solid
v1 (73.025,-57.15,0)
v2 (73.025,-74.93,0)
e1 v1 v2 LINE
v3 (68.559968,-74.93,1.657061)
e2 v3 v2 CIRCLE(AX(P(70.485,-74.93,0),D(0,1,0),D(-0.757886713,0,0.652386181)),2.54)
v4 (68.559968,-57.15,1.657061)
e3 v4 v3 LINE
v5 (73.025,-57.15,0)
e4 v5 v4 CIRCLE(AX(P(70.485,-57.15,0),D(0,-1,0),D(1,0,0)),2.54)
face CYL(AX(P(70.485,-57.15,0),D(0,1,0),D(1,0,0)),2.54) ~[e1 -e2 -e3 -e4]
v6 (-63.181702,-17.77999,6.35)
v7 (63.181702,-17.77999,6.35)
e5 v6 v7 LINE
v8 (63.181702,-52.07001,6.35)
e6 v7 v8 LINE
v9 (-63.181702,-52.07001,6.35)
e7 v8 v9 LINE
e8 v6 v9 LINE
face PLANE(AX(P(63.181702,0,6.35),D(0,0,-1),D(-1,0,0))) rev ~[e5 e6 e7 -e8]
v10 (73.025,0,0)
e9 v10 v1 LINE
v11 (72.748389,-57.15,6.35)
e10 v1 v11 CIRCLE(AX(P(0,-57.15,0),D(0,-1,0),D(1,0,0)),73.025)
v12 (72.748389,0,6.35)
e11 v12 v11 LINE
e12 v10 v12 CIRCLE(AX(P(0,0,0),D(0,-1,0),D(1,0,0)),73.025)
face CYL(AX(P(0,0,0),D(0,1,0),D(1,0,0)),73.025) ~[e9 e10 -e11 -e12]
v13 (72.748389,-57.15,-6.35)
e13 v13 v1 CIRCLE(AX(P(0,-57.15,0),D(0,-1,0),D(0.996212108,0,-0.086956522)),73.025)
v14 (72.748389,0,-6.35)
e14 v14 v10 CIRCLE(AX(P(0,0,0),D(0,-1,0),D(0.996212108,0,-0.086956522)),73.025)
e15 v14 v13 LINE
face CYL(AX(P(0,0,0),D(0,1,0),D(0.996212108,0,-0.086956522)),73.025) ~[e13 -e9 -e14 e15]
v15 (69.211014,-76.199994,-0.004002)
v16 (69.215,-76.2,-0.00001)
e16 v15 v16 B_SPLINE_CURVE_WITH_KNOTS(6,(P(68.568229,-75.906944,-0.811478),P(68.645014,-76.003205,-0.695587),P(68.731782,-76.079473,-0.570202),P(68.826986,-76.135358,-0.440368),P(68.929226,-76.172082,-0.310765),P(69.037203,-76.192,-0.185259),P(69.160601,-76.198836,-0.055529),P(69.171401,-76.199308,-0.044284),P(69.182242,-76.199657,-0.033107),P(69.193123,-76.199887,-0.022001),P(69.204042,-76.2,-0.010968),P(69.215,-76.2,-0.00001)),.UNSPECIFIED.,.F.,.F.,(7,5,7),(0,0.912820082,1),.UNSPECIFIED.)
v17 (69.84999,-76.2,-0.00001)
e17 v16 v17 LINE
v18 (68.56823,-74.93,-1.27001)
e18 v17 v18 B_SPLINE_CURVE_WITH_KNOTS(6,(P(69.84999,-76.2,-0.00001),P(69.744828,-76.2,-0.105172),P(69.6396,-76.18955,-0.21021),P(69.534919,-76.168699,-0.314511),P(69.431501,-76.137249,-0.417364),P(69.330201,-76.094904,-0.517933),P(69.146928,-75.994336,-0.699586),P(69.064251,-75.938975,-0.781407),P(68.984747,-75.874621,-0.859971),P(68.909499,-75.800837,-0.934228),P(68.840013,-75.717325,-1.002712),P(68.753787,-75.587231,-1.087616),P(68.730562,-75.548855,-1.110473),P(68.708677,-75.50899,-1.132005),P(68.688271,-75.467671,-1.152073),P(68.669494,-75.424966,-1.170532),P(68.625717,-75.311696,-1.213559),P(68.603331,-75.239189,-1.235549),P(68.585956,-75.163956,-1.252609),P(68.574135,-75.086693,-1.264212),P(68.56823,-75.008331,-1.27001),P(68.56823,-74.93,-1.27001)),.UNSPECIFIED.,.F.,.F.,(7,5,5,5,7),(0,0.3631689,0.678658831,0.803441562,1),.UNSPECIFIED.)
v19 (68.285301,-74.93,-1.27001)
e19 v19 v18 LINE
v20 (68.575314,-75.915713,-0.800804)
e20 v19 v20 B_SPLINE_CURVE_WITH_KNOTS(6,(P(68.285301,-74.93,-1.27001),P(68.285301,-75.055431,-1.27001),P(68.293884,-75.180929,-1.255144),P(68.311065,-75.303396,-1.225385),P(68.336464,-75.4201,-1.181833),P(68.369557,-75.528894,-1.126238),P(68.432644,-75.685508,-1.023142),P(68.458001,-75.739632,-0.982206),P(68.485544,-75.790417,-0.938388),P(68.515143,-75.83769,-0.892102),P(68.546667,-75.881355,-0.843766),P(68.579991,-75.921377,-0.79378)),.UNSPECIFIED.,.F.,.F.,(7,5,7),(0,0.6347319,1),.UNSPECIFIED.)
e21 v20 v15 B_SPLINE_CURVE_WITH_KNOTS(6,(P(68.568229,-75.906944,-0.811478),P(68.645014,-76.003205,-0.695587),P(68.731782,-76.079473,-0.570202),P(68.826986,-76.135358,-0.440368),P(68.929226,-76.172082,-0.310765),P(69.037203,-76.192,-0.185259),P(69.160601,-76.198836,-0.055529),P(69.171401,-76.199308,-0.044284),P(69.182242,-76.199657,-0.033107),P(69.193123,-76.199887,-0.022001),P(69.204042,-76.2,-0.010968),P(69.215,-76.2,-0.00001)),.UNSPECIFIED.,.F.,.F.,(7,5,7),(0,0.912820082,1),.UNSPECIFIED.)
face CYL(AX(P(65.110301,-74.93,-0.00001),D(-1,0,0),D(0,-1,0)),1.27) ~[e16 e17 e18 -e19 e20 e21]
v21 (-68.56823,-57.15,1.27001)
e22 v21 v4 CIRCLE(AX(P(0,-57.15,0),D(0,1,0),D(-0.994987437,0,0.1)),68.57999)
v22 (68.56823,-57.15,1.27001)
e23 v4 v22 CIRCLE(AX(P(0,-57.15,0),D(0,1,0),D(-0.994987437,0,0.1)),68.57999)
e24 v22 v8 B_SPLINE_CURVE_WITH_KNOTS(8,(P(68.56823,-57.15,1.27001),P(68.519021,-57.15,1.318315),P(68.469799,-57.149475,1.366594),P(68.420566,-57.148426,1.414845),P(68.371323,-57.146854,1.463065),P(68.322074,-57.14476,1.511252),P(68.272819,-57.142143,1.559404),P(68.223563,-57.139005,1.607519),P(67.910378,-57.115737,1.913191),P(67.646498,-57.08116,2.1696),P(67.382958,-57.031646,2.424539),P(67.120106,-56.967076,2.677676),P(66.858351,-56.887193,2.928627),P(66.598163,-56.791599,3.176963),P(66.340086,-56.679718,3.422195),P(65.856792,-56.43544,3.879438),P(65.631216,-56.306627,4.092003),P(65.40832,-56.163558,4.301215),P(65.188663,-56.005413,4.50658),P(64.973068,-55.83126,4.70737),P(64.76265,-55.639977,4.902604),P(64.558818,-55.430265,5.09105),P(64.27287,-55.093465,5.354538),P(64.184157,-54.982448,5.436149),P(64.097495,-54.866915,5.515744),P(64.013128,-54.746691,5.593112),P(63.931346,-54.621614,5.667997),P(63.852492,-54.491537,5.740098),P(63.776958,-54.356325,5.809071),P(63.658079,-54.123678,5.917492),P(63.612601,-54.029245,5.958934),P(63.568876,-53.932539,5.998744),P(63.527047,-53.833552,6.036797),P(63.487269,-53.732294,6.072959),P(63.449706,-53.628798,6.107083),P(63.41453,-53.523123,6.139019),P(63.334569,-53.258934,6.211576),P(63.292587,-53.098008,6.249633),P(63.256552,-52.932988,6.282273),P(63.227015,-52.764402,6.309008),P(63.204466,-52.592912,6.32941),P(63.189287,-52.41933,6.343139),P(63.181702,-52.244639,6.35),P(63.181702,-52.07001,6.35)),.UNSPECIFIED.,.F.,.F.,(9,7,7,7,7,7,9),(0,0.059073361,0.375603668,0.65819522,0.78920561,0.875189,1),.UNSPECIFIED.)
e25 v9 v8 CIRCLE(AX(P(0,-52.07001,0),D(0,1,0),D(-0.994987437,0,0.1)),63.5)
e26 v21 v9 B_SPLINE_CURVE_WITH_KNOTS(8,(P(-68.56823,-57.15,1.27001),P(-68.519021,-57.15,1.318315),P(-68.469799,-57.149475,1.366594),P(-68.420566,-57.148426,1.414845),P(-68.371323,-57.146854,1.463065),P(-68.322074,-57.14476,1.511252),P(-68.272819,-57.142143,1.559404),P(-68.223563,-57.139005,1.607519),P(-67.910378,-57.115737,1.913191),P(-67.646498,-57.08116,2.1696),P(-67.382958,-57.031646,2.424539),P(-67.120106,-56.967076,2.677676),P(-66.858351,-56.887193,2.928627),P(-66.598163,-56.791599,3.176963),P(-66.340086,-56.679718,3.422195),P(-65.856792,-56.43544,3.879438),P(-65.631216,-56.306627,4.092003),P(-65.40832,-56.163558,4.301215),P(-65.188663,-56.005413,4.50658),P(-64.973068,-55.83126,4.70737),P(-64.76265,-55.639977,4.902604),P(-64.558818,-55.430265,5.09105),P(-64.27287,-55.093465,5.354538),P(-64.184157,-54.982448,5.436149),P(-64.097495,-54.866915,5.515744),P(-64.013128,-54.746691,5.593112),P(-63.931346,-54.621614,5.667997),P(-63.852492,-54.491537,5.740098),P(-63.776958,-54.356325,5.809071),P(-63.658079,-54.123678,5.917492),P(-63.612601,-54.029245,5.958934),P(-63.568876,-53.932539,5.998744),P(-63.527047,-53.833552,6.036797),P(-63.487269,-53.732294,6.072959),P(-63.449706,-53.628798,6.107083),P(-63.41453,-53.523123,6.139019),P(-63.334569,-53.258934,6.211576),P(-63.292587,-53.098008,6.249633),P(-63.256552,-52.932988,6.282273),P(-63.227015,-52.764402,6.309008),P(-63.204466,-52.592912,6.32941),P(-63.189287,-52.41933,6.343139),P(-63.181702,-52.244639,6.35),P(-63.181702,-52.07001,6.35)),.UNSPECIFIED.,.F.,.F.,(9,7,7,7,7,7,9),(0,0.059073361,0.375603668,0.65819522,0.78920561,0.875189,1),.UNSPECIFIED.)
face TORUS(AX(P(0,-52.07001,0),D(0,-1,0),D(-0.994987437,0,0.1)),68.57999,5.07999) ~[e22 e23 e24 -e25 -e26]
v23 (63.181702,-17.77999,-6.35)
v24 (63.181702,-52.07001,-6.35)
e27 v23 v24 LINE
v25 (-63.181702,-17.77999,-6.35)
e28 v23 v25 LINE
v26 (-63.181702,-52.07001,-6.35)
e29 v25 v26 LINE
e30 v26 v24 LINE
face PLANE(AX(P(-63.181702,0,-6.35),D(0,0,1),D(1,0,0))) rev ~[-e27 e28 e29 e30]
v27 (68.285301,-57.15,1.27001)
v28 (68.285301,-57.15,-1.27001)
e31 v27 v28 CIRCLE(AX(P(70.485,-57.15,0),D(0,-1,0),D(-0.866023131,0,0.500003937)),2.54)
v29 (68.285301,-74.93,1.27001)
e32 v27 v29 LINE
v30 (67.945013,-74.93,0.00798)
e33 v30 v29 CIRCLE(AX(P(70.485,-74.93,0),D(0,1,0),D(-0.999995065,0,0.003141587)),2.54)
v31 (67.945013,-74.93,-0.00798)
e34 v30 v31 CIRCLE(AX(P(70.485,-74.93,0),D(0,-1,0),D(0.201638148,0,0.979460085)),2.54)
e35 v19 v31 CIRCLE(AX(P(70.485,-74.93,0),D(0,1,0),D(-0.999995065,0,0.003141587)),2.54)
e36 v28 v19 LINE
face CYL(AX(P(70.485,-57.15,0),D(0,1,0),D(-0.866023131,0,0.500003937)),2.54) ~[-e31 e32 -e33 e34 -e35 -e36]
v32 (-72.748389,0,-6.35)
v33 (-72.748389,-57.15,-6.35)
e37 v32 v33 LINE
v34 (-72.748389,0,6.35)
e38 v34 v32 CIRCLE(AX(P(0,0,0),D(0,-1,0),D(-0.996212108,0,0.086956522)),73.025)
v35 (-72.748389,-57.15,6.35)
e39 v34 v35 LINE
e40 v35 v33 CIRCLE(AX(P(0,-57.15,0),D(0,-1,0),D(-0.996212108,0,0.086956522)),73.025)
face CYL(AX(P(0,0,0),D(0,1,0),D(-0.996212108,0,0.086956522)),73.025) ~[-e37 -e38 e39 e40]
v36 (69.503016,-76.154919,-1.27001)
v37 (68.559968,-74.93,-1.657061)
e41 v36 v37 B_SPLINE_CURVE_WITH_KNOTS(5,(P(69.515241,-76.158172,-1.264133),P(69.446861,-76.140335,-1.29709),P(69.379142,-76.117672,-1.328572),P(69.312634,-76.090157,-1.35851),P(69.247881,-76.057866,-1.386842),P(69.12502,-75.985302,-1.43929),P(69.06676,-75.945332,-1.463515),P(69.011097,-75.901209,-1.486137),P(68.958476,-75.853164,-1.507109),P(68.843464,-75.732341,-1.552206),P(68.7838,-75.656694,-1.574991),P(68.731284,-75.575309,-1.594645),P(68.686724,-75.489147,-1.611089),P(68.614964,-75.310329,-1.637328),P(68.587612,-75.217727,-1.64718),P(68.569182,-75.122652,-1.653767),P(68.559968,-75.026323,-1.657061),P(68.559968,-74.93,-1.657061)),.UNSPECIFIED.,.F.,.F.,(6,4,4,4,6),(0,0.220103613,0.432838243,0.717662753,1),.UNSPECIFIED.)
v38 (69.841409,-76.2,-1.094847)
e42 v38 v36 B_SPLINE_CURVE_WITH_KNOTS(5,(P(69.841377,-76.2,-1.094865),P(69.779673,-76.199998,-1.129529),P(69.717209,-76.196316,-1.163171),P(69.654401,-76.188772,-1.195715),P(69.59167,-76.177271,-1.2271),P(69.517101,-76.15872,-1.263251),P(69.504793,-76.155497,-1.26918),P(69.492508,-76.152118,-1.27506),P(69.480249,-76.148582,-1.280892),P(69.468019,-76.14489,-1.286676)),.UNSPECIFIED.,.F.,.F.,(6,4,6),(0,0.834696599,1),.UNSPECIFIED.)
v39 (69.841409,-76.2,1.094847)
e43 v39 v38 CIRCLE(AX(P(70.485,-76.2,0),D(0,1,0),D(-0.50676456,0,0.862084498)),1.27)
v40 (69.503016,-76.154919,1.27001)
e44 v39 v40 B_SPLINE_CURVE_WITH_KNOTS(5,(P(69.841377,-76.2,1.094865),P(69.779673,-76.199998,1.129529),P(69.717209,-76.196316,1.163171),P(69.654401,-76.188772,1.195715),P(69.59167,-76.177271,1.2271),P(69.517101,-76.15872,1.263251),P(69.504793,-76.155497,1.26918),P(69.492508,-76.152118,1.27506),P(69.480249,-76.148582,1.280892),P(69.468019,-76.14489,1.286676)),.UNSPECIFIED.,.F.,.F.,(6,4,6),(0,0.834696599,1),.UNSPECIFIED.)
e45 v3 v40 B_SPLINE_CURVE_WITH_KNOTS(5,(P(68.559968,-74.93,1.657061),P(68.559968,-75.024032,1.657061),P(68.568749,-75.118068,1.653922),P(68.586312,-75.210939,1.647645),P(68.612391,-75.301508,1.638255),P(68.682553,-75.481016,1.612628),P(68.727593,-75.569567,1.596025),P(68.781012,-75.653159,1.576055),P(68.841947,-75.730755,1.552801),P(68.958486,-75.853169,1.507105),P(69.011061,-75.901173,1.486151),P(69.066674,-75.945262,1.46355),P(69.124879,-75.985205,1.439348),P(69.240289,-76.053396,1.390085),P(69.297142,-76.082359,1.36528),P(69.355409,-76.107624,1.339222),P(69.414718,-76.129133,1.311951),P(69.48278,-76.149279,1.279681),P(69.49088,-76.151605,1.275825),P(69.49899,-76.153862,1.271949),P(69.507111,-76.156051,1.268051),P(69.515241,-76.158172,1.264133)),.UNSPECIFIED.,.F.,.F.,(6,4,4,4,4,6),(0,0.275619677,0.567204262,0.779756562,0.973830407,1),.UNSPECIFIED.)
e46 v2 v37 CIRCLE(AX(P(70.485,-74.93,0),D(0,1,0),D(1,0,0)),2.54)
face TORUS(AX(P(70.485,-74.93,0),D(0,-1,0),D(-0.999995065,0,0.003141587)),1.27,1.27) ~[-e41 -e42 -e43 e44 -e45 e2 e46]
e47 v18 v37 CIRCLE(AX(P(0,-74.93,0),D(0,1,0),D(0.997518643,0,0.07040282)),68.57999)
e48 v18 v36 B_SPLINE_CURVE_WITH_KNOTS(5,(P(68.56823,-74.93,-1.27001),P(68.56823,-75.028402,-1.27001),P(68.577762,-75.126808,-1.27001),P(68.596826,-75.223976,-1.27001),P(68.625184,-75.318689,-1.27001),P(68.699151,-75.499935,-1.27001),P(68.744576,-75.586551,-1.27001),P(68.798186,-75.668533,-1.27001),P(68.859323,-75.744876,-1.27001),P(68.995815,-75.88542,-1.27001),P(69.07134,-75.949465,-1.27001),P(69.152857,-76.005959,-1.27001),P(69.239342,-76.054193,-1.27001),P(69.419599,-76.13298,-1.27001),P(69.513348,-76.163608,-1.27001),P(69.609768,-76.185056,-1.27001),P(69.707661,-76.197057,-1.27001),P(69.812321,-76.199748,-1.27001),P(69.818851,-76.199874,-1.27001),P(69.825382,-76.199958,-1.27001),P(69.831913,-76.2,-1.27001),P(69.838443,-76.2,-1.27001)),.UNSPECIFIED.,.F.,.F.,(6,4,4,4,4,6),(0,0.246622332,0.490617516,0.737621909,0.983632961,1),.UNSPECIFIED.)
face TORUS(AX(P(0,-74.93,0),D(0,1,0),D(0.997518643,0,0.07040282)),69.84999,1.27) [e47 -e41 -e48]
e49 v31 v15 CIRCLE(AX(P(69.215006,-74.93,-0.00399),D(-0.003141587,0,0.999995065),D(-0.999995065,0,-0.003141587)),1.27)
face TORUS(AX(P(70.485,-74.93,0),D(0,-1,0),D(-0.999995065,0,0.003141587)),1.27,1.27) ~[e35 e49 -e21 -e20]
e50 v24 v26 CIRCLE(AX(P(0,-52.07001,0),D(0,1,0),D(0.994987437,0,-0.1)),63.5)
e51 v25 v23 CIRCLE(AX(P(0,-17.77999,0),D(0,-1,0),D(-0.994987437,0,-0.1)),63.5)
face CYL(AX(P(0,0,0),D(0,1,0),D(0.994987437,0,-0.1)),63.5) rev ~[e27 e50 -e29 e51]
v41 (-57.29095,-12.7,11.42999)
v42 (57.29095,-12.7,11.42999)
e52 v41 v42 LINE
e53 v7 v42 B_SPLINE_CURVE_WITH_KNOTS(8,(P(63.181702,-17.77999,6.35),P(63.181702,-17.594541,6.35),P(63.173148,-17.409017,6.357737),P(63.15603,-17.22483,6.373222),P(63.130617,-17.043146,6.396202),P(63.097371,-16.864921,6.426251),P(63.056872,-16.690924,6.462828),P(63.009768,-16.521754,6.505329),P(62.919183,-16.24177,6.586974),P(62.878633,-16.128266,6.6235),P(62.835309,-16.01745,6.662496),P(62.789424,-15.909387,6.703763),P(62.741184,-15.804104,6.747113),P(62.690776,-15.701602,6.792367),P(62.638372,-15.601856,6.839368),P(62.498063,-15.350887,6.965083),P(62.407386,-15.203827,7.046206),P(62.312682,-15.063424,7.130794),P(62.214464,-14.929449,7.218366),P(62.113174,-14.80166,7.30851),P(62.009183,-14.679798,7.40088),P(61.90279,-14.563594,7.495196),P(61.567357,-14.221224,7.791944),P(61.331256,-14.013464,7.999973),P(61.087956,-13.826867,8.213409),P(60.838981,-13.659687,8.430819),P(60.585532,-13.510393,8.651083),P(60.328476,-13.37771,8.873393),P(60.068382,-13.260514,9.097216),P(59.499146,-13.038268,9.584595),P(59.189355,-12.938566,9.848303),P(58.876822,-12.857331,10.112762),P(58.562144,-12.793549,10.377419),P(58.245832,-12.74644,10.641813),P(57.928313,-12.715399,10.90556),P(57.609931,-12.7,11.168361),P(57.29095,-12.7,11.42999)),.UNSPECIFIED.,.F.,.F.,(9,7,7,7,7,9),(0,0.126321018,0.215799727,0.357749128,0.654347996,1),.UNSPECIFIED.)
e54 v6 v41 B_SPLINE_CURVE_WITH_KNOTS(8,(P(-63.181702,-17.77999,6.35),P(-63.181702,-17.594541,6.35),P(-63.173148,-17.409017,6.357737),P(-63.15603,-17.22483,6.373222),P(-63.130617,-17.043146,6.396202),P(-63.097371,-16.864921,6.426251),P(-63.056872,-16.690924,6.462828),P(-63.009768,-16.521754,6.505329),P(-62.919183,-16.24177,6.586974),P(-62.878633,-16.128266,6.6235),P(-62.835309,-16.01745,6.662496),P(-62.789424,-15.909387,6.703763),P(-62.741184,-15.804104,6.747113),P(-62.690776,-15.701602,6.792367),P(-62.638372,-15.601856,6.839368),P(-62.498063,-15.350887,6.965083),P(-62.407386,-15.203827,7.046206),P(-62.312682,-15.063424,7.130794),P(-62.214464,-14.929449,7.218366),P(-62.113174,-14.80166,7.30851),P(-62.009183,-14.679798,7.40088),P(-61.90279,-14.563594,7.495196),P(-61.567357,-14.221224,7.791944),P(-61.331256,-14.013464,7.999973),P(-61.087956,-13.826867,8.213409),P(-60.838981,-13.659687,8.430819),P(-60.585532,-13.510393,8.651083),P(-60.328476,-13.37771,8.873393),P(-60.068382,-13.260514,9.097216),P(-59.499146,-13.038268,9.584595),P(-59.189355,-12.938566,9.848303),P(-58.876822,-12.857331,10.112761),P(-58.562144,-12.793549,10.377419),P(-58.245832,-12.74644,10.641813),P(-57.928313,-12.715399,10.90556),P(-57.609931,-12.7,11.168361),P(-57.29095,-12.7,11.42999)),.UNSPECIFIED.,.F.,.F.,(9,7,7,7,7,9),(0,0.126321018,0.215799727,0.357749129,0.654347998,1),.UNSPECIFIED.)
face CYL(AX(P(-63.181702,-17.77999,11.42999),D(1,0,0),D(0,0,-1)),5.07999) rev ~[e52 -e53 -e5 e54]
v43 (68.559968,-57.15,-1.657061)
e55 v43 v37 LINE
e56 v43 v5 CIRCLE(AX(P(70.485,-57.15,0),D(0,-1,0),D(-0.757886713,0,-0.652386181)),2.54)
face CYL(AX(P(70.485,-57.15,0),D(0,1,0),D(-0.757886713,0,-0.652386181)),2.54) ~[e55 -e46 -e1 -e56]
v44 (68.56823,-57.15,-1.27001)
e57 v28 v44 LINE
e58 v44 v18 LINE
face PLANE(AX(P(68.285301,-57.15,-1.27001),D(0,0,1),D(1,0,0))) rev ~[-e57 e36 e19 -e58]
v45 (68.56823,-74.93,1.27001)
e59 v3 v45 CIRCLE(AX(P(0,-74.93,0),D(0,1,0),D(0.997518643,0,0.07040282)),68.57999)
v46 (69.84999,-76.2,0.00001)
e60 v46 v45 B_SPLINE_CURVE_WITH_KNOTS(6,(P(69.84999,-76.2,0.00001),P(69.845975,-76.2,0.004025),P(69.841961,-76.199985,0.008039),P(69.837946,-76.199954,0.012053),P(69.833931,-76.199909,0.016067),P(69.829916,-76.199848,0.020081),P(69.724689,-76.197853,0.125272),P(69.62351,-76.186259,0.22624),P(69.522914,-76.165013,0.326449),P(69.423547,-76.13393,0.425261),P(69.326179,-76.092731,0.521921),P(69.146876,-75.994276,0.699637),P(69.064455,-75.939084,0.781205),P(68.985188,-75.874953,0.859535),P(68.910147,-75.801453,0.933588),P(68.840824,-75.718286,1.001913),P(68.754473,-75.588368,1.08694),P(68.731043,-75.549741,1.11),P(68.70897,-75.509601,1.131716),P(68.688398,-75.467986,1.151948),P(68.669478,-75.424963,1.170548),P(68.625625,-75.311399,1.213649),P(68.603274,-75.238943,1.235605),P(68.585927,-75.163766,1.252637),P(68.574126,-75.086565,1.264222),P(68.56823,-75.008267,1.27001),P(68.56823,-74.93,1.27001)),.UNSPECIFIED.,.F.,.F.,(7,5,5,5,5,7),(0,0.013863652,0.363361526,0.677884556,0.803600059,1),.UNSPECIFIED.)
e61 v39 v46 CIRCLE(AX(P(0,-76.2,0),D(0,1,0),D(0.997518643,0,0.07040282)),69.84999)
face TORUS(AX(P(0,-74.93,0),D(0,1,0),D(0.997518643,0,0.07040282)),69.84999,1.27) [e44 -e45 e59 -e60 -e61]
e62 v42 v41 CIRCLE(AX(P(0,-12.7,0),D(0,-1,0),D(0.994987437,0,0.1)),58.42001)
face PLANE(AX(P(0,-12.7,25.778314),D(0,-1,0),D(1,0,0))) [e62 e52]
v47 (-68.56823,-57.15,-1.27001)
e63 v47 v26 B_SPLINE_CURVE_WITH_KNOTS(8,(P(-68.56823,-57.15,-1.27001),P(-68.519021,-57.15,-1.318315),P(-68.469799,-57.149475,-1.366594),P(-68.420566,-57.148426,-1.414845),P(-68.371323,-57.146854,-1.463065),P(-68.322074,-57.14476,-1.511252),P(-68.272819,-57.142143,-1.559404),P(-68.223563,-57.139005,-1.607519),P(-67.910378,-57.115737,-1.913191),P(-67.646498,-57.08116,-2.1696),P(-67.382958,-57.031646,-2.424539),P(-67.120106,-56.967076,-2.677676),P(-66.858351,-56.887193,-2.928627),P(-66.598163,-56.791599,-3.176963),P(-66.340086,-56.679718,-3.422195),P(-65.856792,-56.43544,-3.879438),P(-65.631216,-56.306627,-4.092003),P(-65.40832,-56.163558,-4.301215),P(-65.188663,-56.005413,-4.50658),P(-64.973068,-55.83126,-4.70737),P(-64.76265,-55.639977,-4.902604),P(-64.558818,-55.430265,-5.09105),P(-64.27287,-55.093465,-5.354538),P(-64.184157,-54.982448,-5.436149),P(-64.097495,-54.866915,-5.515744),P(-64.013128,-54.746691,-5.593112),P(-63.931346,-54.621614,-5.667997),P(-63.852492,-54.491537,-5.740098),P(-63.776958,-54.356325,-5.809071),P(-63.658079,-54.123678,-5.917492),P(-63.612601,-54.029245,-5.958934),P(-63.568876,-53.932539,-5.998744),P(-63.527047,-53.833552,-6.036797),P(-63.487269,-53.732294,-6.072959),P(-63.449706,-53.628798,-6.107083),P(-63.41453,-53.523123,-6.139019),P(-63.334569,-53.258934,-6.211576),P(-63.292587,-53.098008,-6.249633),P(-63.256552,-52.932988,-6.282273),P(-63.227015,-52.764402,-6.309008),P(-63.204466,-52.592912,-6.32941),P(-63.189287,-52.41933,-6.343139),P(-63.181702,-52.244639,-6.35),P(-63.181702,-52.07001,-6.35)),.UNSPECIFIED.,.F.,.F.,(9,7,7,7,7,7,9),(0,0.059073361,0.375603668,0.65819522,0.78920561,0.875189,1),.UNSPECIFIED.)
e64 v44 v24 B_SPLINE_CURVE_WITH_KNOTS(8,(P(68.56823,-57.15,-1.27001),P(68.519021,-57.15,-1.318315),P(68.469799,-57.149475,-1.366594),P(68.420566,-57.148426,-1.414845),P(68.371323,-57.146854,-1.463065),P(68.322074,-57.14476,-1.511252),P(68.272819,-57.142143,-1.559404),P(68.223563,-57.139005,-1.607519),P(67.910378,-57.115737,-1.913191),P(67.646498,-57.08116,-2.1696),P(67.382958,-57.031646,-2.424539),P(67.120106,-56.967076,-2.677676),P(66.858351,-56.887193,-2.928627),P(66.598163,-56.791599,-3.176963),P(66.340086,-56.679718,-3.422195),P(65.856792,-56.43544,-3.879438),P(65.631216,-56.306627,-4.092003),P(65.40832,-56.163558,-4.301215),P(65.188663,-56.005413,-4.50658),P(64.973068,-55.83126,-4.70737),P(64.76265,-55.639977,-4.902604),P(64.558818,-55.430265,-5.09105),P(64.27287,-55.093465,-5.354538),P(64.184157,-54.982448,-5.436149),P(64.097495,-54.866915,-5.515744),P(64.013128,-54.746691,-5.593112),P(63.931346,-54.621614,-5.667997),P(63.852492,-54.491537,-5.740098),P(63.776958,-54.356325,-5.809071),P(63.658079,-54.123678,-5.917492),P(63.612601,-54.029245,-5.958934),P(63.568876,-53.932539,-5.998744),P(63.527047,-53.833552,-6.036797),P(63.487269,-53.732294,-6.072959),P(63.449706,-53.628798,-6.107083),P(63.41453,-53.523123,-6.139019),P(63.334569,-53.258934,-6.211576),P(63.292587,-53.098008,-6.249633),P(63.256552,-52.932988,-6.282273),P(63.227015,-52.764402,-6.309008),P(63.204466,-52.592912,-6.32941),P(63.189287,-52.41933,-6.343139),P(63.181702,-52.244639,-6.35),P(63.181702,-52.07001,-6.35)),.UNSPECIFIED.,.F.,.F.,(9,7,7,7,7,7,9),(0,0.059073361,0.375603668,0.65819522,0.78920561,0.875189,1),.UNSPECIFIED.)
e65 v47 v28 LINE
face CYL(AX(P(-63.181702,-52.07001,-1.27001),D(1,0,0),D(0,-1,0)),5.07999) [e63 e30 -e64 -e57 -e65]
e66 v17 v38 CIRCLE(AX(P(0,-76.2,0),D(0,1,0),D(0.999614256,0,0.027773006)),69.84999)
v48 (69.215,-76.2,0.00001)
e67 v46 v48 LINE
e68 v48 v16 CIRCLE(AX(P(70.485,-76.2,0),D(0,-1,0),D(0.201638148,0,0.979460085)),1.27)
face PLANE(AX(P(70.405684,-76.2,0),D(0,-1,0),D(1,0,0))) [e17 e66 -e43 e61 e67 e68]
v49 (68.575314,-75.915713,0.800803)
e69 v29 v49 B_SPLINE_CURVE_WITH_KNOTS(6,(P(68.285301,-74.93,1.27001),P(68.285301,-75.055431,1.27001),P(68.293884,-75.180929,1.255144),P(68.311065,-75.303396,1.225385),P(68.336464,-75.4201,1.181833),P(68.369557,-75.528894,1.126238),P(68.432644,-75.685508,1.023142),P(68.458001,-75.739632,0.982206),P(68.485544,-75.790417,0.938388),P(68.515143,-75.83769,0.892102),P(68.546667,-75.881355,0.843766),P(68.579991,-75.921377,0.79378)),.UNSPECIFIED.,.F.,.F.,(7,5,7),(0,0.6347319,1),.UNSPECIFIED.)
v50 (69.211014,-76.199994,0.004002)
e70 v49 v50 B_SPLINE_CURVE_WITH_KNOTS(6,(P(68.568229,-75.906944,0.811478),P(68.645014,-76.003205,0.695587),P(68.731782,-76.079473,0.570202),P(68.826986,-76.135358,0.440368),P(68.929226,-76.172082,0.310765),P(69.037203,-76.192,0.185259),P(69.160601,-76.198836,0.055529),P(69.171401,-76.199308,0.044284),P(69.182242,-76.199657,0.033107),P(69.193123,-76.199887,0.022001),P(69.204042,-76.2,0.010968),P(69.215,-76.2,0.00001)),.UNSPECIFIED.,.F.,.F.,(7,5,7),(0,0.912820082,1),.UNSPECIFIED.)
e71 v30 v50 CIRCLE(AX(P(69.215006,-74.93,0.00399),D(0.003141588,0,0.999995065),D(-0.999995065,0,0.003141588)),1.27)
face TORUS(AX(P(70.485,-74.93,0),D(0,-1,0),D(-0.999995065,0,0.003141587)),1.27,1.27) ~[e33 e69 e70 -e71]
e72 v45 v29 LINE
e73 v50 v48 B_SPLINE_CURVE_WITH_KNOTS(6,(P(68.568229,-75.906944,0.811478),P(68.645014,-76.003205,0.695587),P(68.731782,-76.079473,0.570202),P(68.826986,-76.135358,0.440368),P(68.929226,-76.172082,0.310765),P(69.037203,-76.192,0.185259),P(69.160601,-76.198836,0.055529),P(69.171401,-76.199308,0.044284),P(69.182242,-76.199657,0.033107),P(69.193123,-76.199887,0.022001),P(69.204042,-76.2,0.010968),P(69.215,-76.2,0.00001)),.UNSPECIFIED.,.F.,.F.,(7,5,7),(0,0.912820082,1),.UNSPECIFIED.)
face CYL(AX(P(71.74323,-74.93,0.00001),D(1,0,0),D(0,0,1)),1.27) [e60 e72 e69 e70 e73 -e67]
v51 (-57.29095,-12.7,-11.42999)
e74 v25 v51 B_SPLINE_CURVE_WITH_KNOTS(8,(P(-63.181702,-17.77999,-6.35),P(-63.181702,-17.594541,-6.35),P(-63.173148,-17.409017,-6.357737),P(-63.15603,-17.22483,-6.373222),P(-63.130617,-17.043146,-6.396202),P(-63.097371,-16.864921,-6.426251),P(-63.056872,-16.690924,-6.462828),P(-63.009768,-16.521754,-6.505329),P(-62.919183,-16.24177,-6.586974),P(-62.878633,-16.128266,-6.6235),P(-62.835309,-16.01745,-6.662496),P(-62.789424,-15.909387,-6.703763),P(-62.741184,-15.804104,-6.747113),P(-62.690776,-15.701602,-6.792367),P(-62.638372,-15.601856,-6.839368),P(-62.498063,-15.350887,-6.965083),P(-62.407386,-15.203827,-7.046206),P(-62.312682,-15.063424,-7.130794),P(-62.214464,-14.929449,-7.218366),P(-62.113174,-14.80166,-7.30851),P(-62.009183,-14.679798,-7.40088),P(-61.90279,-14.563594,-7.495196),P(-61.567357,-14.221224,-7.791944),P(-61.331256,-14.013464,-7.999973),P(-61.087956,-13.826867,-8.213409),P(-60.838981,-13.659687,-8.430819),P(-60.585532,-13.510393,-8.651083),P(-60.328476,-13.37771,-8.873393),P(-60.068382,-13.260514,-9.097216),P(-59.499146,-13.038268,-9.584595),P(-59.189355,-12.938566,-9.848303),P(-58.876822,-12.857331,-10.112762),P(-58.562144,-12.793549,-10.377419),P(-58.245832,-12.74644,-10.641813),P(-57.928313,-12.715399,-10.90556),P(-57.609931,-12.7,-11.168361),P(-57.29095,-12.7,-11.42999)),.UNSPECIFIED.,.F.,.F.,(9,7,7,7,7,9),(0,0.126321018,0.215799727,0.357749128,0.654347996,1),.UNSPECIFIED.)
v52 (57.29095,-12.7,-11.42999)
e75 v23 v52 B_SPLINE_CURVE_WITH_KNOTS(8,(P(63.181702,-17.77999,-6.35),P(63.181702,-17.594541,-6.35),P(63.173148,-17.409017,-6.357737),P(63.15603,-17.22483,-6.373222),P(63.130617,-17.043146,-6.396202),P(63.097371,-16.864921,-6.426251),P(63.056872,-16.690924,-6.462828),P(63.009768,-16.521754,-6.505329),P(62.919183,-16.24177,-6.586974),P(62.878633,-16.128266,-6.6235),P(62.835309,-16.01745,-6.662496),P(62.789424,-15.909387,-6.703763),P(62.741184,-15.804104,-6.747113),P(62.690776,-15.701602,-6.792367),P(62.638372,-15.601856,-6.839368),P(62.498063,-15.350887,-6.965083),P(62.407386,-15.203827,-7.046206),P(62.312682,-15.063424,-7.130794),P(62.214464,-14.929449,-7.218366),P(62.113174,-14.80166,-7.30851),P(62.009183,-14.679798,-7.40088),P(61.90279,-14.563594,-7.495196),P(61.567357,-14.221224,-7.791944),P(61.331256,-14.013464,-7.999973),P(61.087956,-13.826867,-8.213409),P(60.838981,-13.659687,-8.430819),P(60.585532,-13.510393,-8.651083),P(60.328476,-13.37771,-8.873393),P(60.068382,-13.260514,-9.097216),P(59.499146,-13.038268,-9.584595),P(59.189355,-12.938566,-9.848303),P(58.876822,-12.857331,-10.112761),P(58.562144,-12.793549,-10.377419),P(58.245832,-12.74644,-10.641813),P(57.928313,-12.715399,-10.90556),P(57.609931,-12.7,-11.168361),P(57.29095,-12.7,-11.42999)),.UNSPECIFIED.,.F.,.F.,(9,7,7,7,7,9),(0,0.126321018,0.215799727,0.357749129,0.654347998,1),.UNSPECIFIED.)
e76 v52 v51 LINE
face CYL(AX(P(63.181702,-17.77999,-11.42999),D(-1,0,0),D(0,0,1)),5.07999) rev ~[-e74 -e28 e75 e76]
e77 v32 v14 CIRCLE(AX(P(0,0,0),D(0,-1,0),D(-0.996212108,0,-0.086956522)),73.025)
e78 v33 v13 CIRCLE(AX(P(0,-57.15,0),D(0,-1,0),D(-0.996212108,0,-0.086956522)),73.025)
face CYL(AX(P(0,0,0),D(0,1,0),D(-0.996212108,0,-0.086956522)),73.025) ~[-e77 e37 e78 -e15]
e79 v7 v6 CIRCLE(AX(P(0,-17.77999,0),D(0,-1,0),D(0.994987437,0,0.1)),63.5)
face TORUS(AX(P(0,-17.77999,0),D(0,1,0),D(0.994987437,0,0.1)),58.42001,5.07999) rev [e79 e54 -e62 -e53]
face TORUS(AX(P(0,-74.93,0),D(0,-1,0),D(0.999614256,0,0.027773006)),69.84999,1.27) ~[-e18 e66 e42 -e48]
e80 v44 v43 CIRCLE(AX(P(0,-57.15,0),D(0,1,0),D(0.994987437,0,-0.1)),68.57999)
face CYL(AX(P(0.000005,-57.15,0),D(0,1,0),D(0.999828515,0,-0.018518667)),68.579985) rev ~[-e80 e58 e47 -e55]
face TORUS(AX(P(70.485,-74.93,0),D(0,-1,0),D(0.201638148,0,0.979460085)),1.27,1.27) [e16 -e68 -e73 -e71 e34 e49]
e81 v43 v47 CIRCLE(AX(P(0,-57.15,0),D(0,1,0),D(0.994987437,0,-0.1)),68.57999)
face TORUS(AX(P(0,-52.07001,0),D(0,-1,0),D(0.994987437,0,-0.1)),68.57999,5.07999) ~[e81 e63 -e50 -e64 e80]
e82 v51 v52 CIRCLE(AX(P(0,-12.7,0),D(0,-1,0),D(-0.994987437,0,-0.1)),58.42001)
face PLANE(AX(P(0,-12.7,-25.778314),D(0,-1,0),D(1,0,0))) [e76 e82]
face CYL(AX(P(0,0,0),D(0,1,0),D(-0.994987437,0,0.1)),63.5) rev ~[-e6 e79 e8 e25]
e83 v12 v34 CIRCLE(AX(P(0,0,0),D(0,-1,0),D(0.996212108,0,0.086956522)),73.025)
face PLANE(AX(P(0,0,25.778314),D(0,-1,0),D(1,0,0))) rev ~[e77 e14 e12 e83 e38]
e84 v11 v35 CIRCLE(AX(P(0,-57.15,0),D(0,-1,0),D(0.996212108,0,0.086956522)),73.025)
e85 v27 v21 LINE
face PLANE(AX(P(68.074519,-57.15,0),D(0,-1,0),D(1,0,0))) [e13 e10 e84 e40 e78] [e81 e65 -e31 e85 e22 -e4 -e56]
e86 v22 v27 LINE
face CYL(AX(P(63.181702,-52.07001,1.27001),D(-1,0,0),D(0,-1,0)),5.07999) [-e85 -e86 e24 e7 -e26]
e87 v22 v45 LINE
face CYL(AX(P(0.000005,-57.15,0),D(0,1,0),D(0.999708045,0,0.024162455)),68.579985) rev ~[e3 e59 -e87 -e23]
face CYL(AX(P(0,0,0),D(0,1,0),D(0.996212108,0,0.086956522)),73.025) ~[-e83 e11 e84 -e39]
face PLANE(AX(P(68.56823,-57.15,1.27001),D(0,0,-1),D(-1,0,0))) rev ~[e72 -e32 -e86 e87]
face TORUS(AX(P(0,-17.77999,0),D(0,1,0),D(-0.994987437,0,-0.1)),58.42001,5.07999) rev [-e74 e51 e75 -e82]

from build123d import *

# Parameters (mm, degrees)
F1_DEPTH     = 57.15
F2_DEPTH     = 12.7
F3_R         = 5.07999
F5_DEPTH     = 19.05
F6_T3_ANGLE  = 359.64
F6_T6_ANGLE  = 5.6286048719
F6_T10_ANGLE = 5.6286048719
F6_T14_DEPTH = 6.6329282975
F6_S15_R     = 68.5799900031
F6_T16_DEPTH = 5
F6_T19_ANGLE = 203.2655397093
F6_T22_DEPTH = 6.6329282975
F6_S23_R     = 68.5799900031
F6_T24_DEPTH = 5
F6_T27_ANGLE = 5.6286048719
F6_T31_ANGLE = 5.6286048719
F6_T36_ANGLE = 5.6286048719
F6_T41_DEPTH = 6.6329282975
F6_S42_R     = 68.5799900031
F6_T43_DEPTH = 5
F6_T48_DEPTH = 6.6329282975
F6_S49_R     = 68.5799900031
F6_T50_DEPTH = 5
F6_T53_ANGLE = 5.6286048719


# Not quite as in the source:
# - a fillet or chamfer that OpenCascade refuses, or shapes differently, is made with other operations: its cross-section is extruded or revolved along the edge and cut away or added
# - a fillet or chamfer is up to 0.001 mm smaller than in the source, because OpenCascade refuses the exact size


with BuildPart() as f1:
    # F0 (on Front) → F1 (new body)
    with BuildSketch(Plane.XZ):
        with BuildLine():
            ThreePointArc((72.7483891574, -6.35), (72.9558145154, -3.1780109172), (73.025, 0))
            ThreePointArc((73.025, 0), (72.9558145154, 3.1780109172), (72.7483891574, 6.35))
            Line((72.7483891574, 6.35), (63.1817022563, 6.35))
            ThreePointArc((63.1817022563, 6.35), (63.4203756425, 3.1789862163), (63.5, 0))
            ThreePointArc((63.5, 0), (63.4203756425, -3.1789862163), (63.1817022563, -6.35))
            Line((63.1817022563, -6.35), (72.7483891574, -6.35))
        make_face()
        with BuildLine():
            Line((63.1817022563, 6.35), (72.7483891574, 6.35))
            ThreePointArc((72.7483891574, 6.35), (0, 73.025), (-72.7483891574, 6.35))
            Line((-72.7483891574, 6.35), (-63.1817022563, 6.35))
            ThreePointArc((-63.1817022563, 6.35), (0, 63.5), (63.1817022563, 6.35))
        make_face()
        with BuildLine():
            ThreePointArc((-72.7483891574, -6.35), (0, -73.025), (72.7483891574, -6.35))
            Line((72.7483891574, -6.35), (63.1817022563, -6.35))
            ThreePointArc((63.1817022563, -6.35), (0, -63.5), (-63.1817022563, -6.35))
            Line((-63.1817022563, -6.35), (-72.7483891574, -6.35))
        make_face()
        with BuildLine():
            Line((-63.1817022563, 6.35), (-72.7483891574, 6.35))
            ThreePointArc((-72.7483891574, 6.35), (-73.025, 0), (-72.7483891574, -6.35))
            Line((-72.7483891574, -6.35), (-63.1817022563, -6.35))
            ThreePointArc((-63.1817022563, -6.35), (-63.5, 0), (-63.1817022563, 6.35))
        make_face()
        with BuildLine():
            ThreePointArc((63.5, 0), (63.4203756425, 3.1789862163), (63.1817022563, 6.35))
            Line((63.1817022563, 6.35), (-63.1817022563, 6.35))
            ThreePointArc((-63.1817022563, 6.35), (-63.5, 0), (-63.1817022563, -6.35))
            Line((-63.1817022563, -6.35), (63.1817022563, -6.35))
            ThreePointArc((63.1817022563, -6.35), (63.4203756425, -3.1789862163), (63.5, 0))
        make_face()
    extrude(amount=F1_DEPTH)

    # F0 (on Front) → F2 (join)
    with BuildSketch(Plane.XZ):
        with BuildLine():
            Line((-63.1817022563, 6.35), (63.1817022563, 6.35))
            ThreePointArc((63.1817022563, 6.35), (0, 63.5), (-63.1817022563, 6.35))
        make_face()
        with BuildLine():
            ThreePointArc((-63.1817022563, -6.35), (0, -63.5), (63.1817022563, -6.35))
            Line((63.1817022563, -6.35), (-63.1817022563, -6.35))
        make_face()
    extrude(amount=F2_DEPTH)

    # F3 (radius 5.08 in the source; OpenCascade refuses exactly that, so slightly less here)
    f3_edges = [f1.edges().sort_by_distance(p)[0] for p in [
        (0, -12.7, -6.35),
        (0, -12.7, -63.5),
        (0, -12.7, 63.5),
        (0, -12.7, 6.35),
        (0, -57.15, -63.5),
        (0, -57.15, 63.5),
        (0, -57.15, 6.35),
        (0, -57.15, -6.35),
    ]]
    fillet(f3_edges, radius=F3_R)

    # F4 (on face) → F5 (join)
    with BuildSketch(Plane.XZ.offset(57.15)):
        with BuildLine():
            ThreePointArc((68.5599677477, -1.6570609004), (71.3687471582, -2.3813002667), (73.025, 0))
            ThreePointArc((73.025, 0), (71.3687471582, 2.3813002667), (68.5599677477, 1.6570609004))
            ThreePointArc((68.5599677477, 1.6570609004), (68.5643717635, 1.46354128), (68.5682295455, 1.27001))
            Line((68.5682295455, 1.27001), (68.2853012479, 1.27001))
            ThreePointArc((68.2853012479, 1.27001), (67.945, 0), (68.2853012479, -1.27001))
            Line((68.2853012479, -1.27001), (68.5682295455, -1.27001))
            ThreePointArc((68.5682295455, -1.27001), (68.5643717635, -1.46354128), (68.5599677477, -1.6570609004))
        make_face()
    extrude(amount=F5_DEPTH)

    # F6: fillet of radius 1.27 on 6 edges, made by hand


with BuildPart() as f6_tool1:
    # F6_s2 → F6_t3 (revolve)
    with BuildSketch(Plane(origin=(0.0006956568, 0, 0.2214337012), x_dir=(0, 1, 0), z_dir=(-0.0031415875, 0, -0.9999950652))):
        with BuildLine():
            ThreePointArc((-74.93, 67.9446521708), (-75.8280256121, 68.3166265586), (-76.2, 69.2146521708))
            Line((-76.2, 69.2146521708), (-76.2, 67.9446521708))
            Line((-76.2, 67.9446521708), (-74.93, 67.9446521708))
        make_face()
    revolve(axis=Axis((70.485, -76.2, 0), (0, 1, 0)), revolution_arc=F6_T3_ANGLE)


with BuildPart() as f6_tool4:
    # F6_s5 → F6_t6 (revolve)
    with BuildSketch(Plane(origin=(0, 0, 2e-10), x_dir=(0, 1, 0), z_dir=(-0.0704028203, 0, 0.9975186429))):
        with BuildLine():
            ThreePointArc((-74.93, -68.57999), (-75.8280256121, -68.9519643879), (-76.2, -69.84999))
            Line((-76.2, -69.84999), (-76.2, -68.57999))
            Line((-76.2, -68.57999), (-74.93, -68.57999))
        make_face()
    revolve(axis=Axis((-3.1e-09, -76.2, -1e-10), (0, 1, 0)), revolution_arc=F6_T6_ANGLE)

    split(bisect_by=Plane.XY.offset(1.27001), keep=Keep.TOP)


with BuildPart() as f6_tool8:
    # F6_s9 → F6_t10 (revolve)
    with BuildSketch(Plane(origin=(0, 0, 2e-10), x_dir=(0, 1, 0), z_dir=(-0.0704028203, 0, 0.9975186429))):
        with BuildLine():
            ThreePointArc((-74.93, -68.57999), (-75.8280256121, -68.9519643879), (-76.2, -69.84999))
            Line((-76.2, -69.84999), (-76.2, -68.57999))
            Line((-76.2, -68.57999), (-74.93, -68.57999))
        make_face()
    revolve(axis=Axis((-3.1e-09, -76.2, -1e-10), (0, 1, 0)), revolution_arc=F6_T10_ANGLE)

    split(bisect_by=Plane.XY.offset(-1.27001), keep=Keep.BOTTOM)


with BuildPart() as f6_tool12:
    # F6_s13 → F6_t14 (new body)
    with BuildSketch(Plane.YZ.offset(71.7432295455)):
        with BuildLine():
            ThreePointArc((-74.93, 1.27001), (-75.8280256121, 0.8980356121), (-76.2, 1e-05))
            Line((-76.2, 1e-05), (-76.2, 1.27001))
            Line((-76.2, 1.27001), (-74.93, 1.27001))
        make_face()
    extrude(amount=-F6_T14_DEPTH)

    # F6_s15 → F6_t16 (intersect, symmetric)
    with BuildSketch(Plane.XZ.offset(75.6)):
        with Locations((-3.1e-09, -1e-10)):
            Circle(F6_S15_R)
    extrude(amount=F6_T16_DEPTH, both=True, mode=Mode.INTERSECT)


with BuildPart() as f6_tool17:
    # F6_s18 → F6_t19 (revolve)
    with BuildSketch(Plane(origin=(67.6192248978, 0, -13.9205420564), x_dir=(0, 1, 0), z_dir=(0.9794600845, 0, -0.2016381483))):
        with BuildLine():
            ThreePointArc((-74.93, 16.7524648841), (-75.8280256121, 16.3804904962), (-76.2, 15.4824648841))
            Line((-76.2, 15.4824648841), (-76.2, 16.7524648841))
            Line((-76.2, 16.7524648841), (-74.93, 16.7524648841))
        make_face()
    revolve(axis=Axis((70.485, -76.2, 0), (0, -1, 0)), revolution_arc=F6_T19_ANGLE)


with BuildPart() as f6_tool20:
    # F6_s21 → F6_t22 (new body)
    with BuildSketch(Plane.YZ.offset(65.1103012479)):
        with BuildLine():
            ThreePointArc((-76.2, -1e-05), (-75.8280256121, -0.8980356121), (-74.93, -1.27001))
            Line((-74.93, -1.27001), (-76.2, -1.27001))
            Line((-76.2, -1.27001), (-76.2, -1e-05))
        make_face()
    extrude(amount=F6_T22_DEPTH)

    # F6_s23 → F6_t24 (intersect, symmetric)
    with BuildSketch(Plane.XZ.offset(75.6)):
        with Locations((-3.1e-09, 1e-10)):
            Circle(F6_S23_R)
    extrude(amount=F6_T24_DEPTH, both=True, mode=Mode.INTERSECT)


with BuildPart() as f6_tool25:
    # F6_s26 → F6_t27 (revolve)
    with BuildSketch(Plane(origin=(0, 0, 2e-10), x_dir=(0, 1, 0), z_dir=(-0.027773006, 0, 0.9996142557))):
        with BuildLine():
            ThreePointArc((-76.2, -69.84999), (-75.8280256121, -68.9519643879), (-74.93, -68.57999))
            Line((-74.93, -68.57999), (-76.2, -68.57999))
            Line((-76.2, -68.57999), (-76.2, -69.84999))
        make_face()
    revolve(axis=Axis((-3.1e-09, -76.2, 1e-10), (0, 1, 0)), revolution_arc=F6_T27_ANGLE)

    split(bisect_by=Plane.XY.offset(1.27001), keep=Keep.TOP)


with BuildPart() as f6_tool29:
    # F6_s30 → F6_t31 (revolve)
    with BuildSketch(Plane(origin=(0, 0, 2e-10), x_dir=(0, 1, 0), z_dir=(-0.027773006, 0, 0.9996142557))):
        with BuildLine():
            ThreePointArc((-76.2, -69.84999), (-75.8280256121, -68.9519643879), (-74.93, -68.57999))
            Line((-74.93, -68.57999), (-76.2, -68.57999))
            Line((-76.2, -68.57999), (-76.2, -69.84999))
        make_face()
    revolve(axis=Axis((-3.1e-09, -76.2, 1e-10), (0, 1, 0)), revolution_arc=F6_T31_ANGLE)

    split(bisect_by=Plane.XY.offset(-1.27001), keep=Keep.BOTTOM)


with BuildPart() as f6_tool34:
    # F6_s35 → F6_t36 (revolve)
    with BuildSketch(Plane(origin=(0, 0, 2e-10), x_dir=(0, 1, 0), z_dir=(-0.0704028203, 0, 0.9975186429))):
        with BuildLine():
            ThreePointArc((-74.93, -68.57999), (-75.8280256121, -68.9519643879), (-76.2, -69.84999))
            Line((-76.2, -69.84999), (-76.2, -68.57999))
            Line((-76.2, -68.57999), (-74.93, -68.57999))
        make_face()
    revolve(axis=Axis((-3.1e-09, -76.2, -1e-10), (0, 1, 0)), revolution_arc=F6_T36_ANGLE)

    split(bisect_by=Plane.XY.offset(1.27001), keep=Keep.BOTTOM)

    split(bisect_by=Plane.XY.offset(-1.27001), keep=Keep.TOP)


with BuildPart() as f6_tool39:
    # F6_s40 → F6_t41 (new body)
    with BuildSketch(Plane.YZ.offset(71.7432295455)):
        with BuildLine():
            ThreePointArc((-74.93, 1.27001), (-75.8280256121, 0.8980356121), (-76.2, 1e-05))
            Line((-76.2, 1e-05), (-76.2, 1.27001))
            Line((-76.2, 1.27001), (-74.93, 1.27001))
        make_face()
    extrude(amount=-F6_T41_DEPTH)

    # F6_s42 → F6_t43 (cut, symmetric)
    with BuildSketch(Plane.XZ.offset(75.6)):
        with Locations((-3.1e-09, -1e-10)):
            Circle(F6_S42_R)
    extrude(amount=F6_T43_DEPTH, both=True, mode=Mode.SUBTRACT)


with BuildPart() as f6_tool34_1:
    add(f6_tool34.part)

    # F6_t44: intersect F6_tool39
    add(f6_tool39.part, mode=Mode.INTERSECT)


with BuildPart() as f6_tool46:
    # F6_s47 → F6_t48 (new body)
    with BuildSketch(Plane.YZ.offset(65.1103012479)):
        with BuildLine():
            ThreePointArc((-76.2, -1e-05), (-75.8280256121, -0.8980356121), (-74.93, -1.27001))
            Line((-74.93, -1.27001), (-76.2, -1.27001))
            Line((-76.2, -1.27001), (-76.2, -1e-05))
        make_face()
    extrude(amount=F6_T48_DEPTH)

    # F6_s49 → F6_t50 (cut, symmetric)
    with BuildSketch(Plane.XZ.offset(75.6)):
        with Locations((-3.1e-09, 1e-10)):
            Circle(F6_S49_R)
    extrude(amount=F6_T50_DEPTH, both=True, mode=Mode.SUBTRACT)


with BuildPart() as f6_tool51:
    # F6_s52 → F6_t53 (revolve)
    with BuildSketch(Plane(origin=(0, 0, 2e-10), x_dir=(0, 1, 0), z_dir=(-0.027773006, 0, 0.9996142557))):
        with BuildLine():
            ThreePointArc((-76.2, -69.84999), (-75.8280256121, -68.9519643879), (-74.93, -68.57999))
            Line((-74.93, -68.57999), (-76.2, -68.57999))
            Line((-76.2, -68.57999), (-76.2, -69.84999))
        make_face()
    revolve(axis=Axis((-3.1e-09, -76.2, 1e-10), (0, 1, 0)), revolution_arc=F6_T53_ANGLE)

    split(bisect_by=Plane.XY.offset(1.27001), keep=Keep.BOTTOM)

    split(bisect_by=Plane.XY.offset(-1.27001), keep=Keep.TOP)


with BuildPart() as f6_tool46_1:
    add(f6_tool46.part)

    # F6_t56: intersect F6_tool51
    add(f6_tool51.part, mode=Mode.INTERSECT)


with BuildPart() as f1_1:
    add(f1.part)

    # F6_t57: cut F6_tool1, F6_tool4, F6_tool8, F6_tool12, F6_tool17, F6_tool20, F6_tool25, F6_tool29, F6_tool34, F6_tool46
    add([f6_tool1.part, f6_tool4.part, f6_tool8.part, f6_tool12.part, f6_tool17.part, f6_tool20.part, f6_tool25.part, f6_tool29.part, f6_tool34_1.part, f6_tool46_1.part], mode=Mode.SUBTRACT)


solid = f1_1.part
